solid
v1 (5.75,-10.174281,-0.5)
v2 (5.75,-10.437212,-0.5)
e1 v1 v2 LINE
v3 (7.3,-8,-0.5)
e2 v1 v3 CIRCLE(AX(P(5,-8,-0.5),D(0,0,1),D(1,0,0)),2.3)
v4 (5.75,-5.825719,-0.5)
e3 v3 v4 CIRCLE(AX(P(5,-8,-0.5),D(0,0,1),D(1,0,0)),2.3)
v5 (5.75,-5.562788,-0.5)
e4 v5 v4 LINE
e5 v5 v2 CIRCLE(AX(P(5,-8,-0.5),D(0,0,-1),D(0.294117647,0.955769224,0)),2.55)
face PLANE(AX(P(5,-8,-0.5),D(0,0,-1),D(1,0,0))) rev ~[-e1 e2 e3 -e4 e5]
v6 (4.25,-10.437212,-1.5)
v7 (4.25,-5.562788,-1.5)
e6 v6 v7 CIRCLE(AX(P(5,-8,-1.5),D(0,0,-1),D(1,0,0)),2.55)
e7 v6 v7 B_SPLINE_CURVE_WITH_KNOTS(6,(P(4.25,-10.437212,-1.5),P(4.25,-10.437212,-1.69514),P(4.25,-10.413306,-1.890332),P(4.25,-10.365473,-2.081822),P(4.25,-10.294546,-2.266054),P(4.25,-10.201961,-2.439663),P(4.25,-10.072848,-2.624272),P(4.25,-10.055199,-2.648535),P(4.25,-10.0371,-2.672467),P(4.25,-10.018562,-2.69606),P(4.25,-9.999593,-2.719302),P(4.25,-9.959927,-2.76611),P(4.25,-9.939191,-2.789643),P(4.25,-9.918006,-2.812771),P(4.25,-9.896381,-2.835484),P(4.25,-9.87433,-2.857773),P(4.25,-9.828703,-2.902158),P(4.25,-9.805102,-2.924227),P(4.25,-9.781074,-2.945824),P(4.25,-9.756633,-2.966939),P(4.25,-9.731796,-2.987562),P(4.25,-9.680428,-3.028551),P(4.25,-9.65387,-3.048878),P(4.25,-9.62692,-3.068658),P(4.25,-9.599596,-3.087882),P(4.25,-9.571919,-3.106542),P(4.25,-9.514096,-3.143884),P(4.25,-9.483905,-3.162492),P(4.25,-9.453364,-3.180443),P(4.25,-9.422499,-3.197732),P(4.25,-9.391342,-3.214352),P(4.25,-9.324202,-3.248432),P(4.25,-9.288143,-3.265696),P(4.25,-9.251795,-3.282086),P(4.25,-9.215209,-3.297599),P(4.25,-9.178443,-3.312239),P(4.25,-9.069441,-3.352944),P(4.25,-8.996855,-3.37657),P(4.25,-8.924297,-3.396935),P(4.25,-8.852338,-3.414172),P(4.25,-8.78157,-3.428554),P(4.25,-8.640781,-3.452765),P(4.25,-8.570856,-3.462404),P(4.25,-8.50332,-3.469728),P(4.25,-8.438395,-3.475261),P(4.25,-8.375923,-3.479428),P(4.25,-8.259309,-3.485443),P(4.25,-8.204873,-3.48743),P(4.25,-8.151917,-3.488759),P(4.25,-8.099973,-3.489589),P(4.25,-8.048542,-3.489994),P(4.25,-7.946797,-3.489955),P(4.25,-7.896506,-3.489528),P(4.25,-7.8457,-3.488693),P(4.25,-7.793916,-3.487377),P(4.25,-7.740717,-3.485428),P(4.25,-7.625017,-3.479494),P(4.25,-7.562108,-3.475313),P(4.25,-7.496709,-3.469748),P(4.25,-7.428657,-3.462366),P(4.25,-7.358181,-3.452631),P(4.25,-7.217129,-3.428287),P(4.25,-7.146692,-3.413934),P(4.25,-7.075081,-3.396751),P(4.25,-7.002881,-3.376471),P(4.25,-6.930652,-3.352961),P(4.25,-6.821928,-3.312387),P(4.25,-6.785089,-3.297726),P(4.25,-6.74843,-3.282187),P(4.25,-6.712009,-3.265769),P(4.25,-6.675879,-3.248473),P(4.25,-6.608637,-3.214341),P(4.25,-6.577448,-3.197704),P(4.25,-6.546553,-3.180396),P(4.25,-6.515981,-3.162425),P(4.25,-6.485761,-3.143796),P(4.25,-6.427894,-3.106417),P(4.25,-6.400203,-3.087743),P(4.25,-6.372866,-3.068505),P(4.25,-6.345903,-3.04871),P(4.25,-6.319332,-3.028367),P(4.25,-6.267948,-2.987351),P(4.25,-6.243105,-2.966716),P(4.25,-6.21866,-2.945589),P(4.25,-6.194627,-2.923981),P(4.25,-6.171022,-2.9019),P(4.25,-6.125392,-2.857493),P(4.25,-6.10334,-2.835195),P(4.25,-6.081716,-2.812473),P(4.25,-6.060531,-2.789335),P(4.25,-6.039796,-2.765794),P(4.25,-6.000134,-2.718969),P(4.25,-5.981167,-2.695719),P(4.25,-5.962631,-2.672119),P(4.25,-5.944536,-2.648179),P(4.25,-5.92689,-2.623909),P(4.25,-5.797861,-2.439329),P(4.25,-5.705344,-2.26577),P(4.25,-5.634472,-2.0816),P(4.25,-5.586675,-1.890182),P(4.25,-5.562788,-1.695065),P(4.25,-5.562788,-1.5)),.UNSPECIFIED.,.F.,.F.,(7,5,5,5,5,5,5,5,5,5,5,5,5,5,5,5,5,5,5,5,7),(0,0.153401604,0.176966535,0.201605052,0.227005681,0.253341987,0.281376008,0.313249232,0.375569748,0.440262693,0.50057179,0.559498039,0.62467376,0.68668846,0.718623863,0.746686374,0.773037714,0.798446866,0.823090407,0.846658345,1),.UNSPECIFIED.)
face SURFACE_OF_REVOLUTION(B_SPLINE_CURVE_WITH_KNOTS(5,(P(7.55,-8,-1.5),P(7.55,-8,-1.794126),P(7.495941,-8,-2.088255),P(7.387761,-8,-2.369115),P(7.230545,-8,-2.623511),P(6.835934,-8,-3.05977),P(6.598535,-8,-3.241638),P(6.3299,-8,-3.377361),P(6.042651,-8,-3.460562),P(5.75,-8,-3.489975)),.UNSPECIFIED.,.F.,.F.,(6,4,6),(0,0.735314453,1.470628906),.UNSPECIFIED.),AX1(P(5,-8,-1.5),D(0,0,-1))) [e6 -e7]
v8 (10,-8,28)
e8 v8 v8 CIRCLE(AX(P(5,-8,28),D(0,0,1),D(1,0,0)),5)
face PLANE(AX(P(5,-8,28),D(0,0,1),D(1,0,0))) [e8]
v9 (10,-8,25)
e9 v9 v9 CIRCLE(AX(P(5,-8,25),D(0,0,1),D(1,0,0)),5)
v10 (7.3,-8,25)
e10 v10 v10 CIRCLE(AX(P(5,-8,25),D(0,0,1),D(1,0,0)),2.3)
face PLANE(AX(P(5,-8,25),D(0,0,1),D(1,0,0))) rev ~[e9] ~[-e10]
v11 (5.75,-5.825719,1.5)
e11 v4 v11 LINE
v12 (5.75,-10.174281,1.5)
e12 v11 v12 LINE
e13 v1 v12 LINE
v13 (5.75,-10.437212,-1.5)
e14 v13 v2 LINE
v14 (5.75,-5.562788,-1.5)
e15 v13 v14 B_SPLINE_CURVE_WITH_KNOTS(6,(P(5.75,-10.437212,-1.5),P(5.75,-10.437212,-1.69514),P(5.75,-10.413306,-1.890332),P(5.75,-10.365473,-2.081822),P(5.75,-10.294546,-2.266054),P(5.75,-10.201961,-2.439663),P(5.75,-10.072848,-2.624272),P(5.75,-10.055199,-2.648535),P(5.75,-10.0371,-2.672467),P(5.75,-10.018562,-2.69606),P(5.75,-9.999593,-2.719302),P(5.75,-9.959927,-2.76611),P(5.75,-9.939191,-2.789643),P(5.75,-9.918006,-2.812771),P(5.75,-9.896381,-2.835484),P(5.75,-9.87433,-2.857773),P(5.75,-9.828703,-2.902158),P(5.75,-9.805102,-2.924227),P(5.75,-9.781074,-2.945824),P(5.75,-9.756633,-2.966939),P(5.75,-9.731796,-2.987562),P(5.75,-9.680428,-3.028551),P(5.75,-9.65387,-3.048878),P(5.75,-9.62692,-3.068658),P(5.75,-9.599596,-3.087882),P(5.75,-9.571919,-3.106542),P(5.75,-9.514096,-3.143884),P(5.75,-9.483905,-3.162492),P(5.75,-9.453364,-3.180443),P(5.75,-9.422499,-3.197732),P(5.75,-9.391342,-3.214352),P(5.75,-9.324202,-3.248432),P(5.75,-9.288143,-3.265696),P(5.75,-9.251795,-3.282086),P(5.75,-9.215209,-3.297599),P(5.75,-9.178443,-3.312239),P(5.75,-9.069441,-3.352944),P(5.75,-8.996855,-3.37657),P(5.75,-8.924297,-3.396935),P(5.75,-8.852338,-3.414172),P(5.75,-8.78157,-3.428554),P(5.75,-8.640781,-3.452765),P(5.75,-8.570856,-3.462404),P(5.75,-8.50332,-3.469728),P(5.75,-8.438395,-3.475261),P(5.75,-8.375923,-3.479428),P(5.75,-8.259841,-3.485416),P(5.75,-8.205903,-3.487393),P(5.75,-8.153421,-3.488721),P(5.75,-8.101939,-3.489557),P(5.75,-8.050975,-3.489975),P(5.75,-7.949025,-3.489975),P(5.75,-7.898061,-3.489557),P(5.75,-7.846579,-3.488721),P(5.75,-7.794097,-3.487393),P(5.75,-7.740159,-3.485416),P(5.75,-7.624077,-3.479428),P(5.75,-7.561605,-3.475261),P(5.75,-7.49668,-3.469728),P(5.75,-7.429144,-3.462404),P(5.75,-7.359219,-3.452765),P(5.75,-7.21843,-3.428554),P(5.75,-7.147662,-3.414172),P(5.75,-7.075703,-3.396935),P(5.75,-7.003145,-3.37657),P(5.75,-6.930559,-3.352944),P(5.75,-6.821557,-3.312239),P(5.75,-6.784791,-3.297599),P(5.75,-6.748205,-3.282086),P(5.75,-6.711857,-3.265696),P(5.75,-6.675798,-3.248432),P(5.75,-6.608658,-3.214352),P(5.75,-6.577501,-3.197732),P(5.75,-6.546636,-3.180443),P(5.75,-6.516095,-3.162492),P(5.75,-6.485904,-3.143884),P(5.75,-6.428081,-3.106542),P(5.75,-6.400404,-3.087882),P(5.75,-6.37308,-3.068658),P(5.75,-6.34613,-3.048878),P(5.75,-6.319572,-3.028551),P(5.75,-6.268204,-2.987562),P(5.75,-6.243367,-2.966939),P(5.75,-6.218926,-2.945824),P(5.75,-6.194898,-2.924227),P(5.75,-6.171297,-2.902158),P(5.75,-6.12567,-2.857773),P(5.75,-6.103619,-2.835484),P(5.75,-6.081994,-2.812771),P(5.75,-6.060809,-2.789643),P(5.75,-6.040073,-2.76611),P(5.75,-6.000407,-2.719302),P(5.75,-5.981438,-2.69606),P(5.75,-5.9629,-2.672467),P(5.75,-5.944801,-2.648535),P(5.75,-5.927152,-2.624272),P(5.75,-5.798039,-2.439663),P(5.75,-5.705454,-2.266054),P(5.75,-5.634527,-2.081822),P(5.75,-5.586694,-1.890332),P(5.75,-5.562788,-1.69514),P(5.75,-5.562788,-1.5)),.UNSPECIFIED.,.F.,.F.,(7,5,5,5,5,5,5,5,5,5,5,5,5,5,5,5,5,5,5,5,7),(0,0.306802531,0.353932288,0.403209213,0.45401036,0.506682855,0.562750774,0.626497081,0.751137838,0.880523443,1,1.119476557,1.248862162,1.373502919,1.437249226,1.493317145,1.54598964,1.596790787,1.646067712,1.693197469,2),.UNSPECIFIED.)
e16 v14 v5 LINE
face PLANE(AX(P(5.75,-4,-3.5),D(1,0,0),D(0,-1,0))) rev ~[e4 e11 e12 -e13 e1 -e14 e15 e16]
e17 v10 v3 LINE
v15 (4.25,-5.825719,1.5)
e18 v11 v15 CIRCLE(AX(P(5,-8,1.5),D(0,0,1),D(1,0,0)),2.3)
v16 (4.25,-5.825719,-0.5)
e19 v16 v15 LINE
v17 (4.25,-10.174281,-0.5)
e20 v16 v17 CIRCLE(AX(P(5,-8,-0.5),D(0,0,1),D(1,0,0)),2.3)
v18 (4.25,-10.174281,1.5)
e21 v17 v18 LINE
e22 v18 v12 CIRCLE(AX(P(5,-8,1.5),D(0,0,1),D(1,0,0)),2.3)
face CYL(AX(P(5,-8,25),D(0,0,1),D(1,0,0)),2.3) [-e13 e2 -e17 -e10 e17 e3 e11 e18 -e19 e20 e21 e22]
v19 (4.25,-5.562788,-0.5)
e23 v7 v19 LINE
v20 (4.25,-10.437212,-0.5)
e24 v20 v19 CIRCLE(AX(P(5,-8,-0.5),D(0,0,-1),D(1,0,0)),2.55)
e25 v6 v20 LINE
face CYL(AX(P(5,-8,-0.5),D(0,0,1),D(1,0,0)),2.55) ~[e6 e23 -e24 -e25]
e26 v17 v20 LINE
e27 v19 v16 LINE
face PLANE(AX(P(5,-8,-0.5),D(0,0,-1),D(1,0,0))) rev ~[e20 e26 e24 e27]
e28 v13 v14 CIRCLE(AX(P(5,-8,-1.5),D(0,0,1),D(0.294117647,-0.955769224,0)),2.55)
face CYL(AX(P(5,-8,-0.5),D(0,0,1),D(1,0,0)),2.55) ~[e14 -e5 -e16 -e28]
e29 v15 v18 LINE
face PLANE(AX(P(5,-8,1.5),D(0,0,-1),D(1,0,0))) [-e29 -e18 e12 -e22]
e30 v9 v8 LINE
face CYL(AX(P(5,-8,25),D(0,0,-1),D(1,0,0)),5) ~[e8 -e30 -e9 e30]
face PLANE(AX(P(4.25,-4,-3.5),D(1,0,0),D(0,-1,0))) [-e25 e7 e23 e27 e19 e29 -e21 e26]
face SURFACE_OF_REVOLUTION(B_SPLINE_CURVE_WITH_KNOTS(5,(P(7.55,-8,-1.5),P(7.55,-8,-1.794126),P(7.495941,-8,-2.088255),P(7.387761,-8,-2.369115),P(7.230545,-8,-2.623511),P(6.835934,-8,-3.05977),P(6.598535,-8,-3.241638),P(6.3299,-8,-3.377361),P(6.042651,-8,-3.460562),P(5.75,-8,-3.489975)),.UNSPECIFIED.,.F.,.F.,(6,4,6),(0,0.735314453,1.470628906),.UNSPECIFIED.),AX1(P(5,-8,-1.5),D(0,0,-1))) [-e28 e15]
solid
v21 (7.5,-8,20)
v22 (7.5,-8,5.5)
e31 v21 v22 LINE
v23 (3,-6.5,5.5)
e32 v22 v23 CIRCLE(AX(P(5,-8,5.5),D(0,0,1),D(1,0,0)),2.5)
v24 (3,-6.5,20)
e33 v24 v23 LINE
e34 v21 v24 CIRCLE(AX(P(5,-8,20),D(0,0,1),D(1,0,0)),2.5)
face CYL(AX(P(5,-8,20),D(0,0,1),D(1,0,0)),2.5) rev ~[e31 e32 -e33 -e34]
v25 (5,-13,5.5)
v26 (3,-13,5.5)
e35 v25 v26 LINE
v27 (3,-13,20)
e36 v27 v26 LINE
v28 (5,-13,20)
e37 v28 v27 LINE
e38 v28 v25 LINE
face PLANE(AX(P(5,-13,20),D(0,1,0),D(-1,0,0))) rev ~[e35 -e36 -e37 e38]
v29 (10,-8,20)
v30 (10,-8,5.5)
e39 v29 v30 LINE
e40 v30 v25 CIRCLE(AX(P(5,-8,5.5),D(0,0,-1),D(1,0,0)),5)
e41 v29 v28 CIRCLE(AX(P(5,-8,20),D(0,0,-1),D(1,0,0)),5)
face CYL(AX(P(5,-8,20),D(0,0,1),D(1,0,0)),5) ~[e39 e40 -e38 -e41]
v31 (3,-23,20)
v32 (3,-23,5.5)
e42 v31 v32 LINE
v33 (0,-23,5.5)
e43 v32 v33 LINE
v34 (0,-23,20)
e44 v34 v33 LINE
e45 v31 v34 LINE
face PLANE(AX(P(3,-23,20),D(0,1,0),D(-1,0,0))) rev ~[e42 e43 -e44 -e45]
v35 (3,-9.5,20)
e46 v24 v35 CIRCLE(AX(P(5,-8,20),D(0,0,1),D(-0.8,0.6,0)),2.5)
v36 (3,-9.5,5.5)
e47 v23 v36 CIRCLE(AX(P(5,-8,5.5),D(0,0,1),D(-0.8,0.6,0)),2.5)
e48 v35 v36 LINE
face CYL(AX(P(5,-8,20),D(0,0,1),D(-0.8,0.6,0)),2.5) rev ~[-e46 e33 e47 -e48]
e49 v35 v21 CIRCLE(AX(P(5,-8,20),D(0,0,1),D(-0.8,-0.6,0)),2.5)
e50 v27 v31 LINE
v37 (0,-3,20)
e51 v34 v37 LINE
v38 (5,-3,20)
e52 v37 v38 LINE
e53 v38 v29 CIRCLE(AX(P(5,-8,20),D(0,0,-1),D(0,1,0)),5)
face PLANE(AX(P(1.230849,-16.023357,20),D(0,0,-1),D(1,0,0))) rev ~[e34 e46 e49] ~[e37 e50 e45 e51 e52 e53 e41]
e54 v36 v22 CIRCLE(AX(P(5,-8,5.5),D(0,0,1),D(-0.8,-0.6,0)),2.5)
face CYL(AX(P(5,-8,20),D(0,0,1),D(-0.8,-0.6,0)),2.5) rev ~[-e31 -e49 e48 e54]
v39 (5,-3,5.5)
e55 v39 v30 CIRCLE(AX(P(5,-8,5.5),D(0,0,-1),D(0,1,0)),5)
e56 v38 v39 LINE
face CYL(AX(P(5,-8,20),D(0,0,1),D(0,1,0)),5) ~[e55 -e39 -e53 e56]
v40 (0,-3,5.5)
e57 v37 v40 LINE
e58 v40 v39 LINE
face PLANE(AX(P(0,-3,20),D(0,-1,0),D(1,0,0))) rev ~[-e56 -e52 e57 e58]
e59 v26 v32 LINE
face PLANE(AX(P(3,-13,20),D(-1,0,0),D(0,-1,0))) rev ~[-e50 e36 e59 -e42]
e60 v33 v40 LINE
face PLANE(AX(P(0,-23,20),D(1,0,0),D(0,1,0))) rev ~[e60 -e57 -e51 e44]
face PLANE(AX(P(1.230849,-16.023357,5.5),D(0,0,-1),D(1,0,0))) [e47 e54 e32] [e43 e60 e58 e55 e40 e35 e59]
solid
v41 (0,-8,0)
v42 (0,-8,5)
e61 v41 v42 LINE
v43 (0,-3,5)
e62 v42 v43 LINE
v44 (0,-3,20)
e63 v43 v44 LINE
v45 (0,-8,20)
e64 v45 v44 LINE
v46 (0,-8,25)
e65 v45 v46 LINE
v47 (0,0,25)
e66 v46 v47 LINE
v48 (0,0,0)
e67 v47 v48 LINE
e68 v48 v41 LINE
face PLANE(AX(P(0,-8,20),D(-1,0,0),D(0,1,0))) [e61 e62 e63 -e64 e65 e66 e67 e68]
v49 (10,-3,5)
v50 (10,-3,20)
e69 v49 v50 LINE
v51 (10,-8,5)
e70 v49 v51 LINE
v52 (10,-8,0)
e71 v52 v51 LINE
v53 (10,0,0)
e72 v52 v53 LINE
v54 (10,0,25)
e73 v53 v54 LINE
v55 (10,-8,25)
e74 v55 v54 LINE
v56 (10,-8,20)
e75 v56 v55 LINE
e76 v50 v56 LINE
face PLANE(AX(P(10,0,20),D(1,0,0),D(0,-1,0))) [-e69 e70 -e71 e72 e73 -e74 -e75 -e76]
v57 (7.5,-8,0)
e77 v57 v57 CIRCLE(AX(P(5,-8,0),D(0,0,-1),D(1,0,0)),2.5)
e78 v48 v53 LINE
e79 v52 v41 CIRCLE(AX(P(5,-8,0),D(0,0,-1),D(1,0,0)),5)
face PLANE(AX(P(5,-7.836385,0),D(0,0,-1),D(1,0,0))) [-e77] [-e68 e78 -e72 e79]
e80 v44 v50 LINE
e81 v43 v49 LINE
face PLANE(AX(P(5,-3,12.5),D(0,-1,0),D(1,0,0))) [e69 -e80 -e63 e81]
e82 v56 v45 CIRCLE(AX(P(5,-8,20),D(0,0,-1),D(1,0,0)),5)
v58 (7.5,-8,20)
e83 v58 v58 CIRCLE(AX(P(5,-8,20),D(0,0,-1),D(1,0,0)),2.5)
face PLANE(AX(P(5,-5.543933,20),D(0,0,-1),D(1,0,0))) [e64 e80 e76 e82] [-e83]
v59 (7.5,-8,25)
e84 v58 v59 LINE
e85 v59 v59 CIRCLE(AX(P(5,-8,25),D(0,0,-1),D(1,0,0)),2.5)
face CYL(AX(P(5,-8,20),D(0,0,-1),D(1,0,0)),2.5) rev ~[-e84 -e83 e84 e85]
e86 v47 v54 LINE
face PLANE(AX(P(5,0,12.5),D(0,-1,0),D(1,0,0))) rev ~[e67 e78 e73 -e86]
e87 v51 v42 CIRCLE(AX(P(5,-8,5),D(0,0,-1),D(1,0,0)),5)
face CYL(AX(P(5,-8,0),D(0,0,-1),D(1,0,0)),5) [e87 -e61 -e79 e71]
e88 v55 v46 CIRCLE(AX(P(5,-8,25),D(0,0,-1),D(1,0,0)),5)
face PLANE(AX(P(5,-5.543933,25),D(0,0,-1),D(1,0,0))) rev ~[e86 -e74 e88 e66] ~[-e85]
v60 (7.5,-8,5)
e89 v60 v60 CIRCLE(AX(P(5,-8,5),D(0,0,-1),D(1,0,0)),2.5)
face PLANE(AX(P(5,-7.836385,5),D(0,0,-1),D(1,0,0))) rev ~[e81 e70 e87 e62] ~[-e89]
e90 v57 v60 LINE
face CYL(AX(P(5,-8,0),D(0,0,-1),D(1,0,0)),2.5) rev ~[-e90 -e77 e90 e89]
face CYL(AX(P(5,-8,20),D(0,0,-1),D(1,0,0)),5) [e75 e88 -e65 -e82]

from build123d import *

# Parameters (mm, degrees)
F0_W      = 10
F0_H      = 25
F1_DEPTH  = 3
F2_R      = 2.5
F3_DEPTH  = 5
F4_START  = -20
F3_FACE_R = 2.5
F4_DEPTH  = 5
F6_DEPTH  = 14.5
F7_R      = 2.5
F7_R_2    = 2.3
F8_DEPTH  = 3
F9_DEPTH  = 25.5
F10_R     = 2.55
F11_DEPTH = 3
F12_R     = 2
F13_W     = 1.5
F13_H     = 8
F14_DEPTH = 5


with BuildPart() as f1:
    # F0 (on Front) → F1 (new body)
    with BuildSketch(Plane.XZ):
        with Locations((5, 12.5)):
            Rectangle(F0_W, F0_H)
    extrude(amount=F1_DEPTH)

    # F2 (on face) → F3 (join)
    with BuildSketch(Plane(origin=(0, 0, 0), x_dir=(1, 0, 0), z_dir=(0, 0, -1))):
        with BuildLine():
            ThreePointArc((5, 3), (8.5355339059, 4.4644660941), (10, 8))
            ThreePointArc((10, 8), (5, 13), (0, 8))
            ThreePointArc((0, 8), (1.4644660941, 4.4644660941), (5, 3))
        make_face()
        with Locations((5, 8)):
            Circle(F2_R, mode=Mode.SUBTRACT)
        with BuildLine():
            ThreePointArc((5, 3), (1.4644660941, 4.4644660941), (0, 8))
            Line((0, 8), (0, 3))
            Line((0, 3), (5, 3))
        make_face()
        with BuildLine():
            Line((10, 3), (10, 8))
            ThreePointArc((10, 8), (8.5355339059, 4.4644660941), (5, 3))
            Line((5, 3), (10, 3))
        make_face()
    extrude(amount=-F3_DEPTH)

    # F3_face (on face) → F4 (join)
    with BuildSketch(Plane(origin=(5, -5.6246622599, 0), x_dir=(1, 0, 0), z_dir=(0, 0, -1)).offset(F4_START)):
        with BuildLine():
            Line((-5, 2.3753377401), (-5, -5.6246622599))
            Line((-5, -5.6246622599), (5, -5.6246622599))
            Line((5, -5.6246622599), (5, 2.3753377401))
            ThreePointArc((5, 2.3753377401), (0, 7.3753377401), (-5, 2.3753377401))
        make_face()
        with Locations((0, 2.3753377401)):
            Circle(F3_FACE_R, mode=Mode.SUBTRACT)
    extrude(amount=-F4_DEPTH)


with BuildPart() as f6:
    # F5 (on face) → F6 (new body)
    with BuildSketch(Plane(origin=(0, 0, 20), x_dir=(1, 0, 0), z_dir=(0, 0, -1))):
        with BuildLine():
            ThreePointArc((0, 8), (0.8166998673, 10.7386127875), (3, 12.582575695))
            Line((3, 12.582575695), (3, 13))
            Line((3, 13), (3, 23))
            Line((3, 23), (0, 23))
            Line((0, 23), (0, 8))
        make_face()
        with BuildLine():
            Line((3, 9.5), (3, 12.582575695))
            ThreePointArc((3, 12.582575695), (0.8166998673, 10.7386127875), (0, 8))
            ThreePointArc((0, 8), (0.8166998673, 5.2613872125), (3, 3.417424305))
            Line((3, 3.417424305), (3, 6.5))
            ThreePointArc((3, 6.5), (2.5, 8), (3, 9.5))
        make_face()
        with BuildLine():
            Line((3, 3), (3, 3.417424305))
            ThreePointArc((3, 3.417424305), (0.8166998673, 5.2613872125), (0, 8))
            Line((0, 8), (0, 3))
            Line((0, 3), (3, 3))
        make_face()
        with BuildLine():
            ThreePointArc((5, 3), (8.5355339059, 4.4644660941), (10, 8))
            ThreePointArc((10, 8), (8.5355339059, 11.5355339059), (5, 13))
            ThreePointArc((5, 13), (3.9784517816, 12.8945315647), (3, 12.582575695))
            Line((3, 12.582575695), (3, 9.5))
            ThreePointArc((3, 9.5), (5.790569415, 10.3717082451), (7.5, 8))
            ThreePointArc((7.5, 8), (5.790569415, 5.6282917549), (3, 6.5))
            Line((3, 6.5), (3, 3.417424305))
            ThreePointArc((3, 3.417424305), (3.9784517816, 3.1054684353), (5, 3))
        make_face()
        with BuildLine():
            Line((3, 3), (5, 3))
            ThreePointArc((5, 3), (3.9784517816, 3.1054684353), (3, 3.417424305))
            Line((3, 3.417424305), (3, 3))
        make_face()
        with BuildLine():
            ThreePointArc((3, 12.582575695), (3.9784517816, 12.8945315647), (5, 13))
            Line((5, 13), (3, 13))
            Line((3, 13), (3, 12.582575695))
        make_face()
    extrude(amount=F6_DEPTH)


with BuildPart() as f8:
    # F7 (on face) → F8 (new body)
    with BuildSketch(Plane.XY.offset(25)):
        with BuildLine():
            ThreePointArc((0, -8), (5, -13), (10, -8))
            ThreePointArc((10, -8), (5, -3), (0, -8))
        make_face()
        with Locations((5, -8)):
            Circle(F7_R, mode=Mode.SUBTRACT)
        with Locations((5, -8)):
            Circle(F7_R)
        with Locations((5, -8)):
            Circle(F7_R_2, mode=Mode.SUBTRACT)
        with Locations((5, -8)):
            Circle(F7_R_2)
    extrude(amount=F8_DEPTH)

    # F7 (on face) → F9 (join)
    with BuildSketch(Plane.XY.offset(25)):
        with Locations((5, -8)):
            Circle(F7_R_2)
    extrude(amount=-F9_DEPTH)

    # F10 (on face) → F11 (join)
    with BuildSketch(Plane(origin=(0, 0, -0.5), x_dir=(1, 0, 0), z_dir=(0, 0, -1))):
        with Locations((5, 8)):
            Circle(F10_R)
    extrude(amount=F11_DEPTH)

    # F12
    f12_edges = [f8.edges().sort_by_distance(p)[0] for p in [
        (2.45, -8, -3.5),
    ]]
    fillet(f12_edges, radius=F12_R)

    # F13 (on face) → F14 (cut)
    with BuildSketch(Plane(origin=(0, 0, -3.5), x_dir=(1, 0, 0), z_dir=(0, 0, -1))):
        with Locations((5, 8)):
            Rectangle(F13_W, F13_H)
    extrude(amount=-F14_DEPTH, mode=Mode.SUBTRACT)


solid = Compound([f1.part, f6.part, f8.part])
